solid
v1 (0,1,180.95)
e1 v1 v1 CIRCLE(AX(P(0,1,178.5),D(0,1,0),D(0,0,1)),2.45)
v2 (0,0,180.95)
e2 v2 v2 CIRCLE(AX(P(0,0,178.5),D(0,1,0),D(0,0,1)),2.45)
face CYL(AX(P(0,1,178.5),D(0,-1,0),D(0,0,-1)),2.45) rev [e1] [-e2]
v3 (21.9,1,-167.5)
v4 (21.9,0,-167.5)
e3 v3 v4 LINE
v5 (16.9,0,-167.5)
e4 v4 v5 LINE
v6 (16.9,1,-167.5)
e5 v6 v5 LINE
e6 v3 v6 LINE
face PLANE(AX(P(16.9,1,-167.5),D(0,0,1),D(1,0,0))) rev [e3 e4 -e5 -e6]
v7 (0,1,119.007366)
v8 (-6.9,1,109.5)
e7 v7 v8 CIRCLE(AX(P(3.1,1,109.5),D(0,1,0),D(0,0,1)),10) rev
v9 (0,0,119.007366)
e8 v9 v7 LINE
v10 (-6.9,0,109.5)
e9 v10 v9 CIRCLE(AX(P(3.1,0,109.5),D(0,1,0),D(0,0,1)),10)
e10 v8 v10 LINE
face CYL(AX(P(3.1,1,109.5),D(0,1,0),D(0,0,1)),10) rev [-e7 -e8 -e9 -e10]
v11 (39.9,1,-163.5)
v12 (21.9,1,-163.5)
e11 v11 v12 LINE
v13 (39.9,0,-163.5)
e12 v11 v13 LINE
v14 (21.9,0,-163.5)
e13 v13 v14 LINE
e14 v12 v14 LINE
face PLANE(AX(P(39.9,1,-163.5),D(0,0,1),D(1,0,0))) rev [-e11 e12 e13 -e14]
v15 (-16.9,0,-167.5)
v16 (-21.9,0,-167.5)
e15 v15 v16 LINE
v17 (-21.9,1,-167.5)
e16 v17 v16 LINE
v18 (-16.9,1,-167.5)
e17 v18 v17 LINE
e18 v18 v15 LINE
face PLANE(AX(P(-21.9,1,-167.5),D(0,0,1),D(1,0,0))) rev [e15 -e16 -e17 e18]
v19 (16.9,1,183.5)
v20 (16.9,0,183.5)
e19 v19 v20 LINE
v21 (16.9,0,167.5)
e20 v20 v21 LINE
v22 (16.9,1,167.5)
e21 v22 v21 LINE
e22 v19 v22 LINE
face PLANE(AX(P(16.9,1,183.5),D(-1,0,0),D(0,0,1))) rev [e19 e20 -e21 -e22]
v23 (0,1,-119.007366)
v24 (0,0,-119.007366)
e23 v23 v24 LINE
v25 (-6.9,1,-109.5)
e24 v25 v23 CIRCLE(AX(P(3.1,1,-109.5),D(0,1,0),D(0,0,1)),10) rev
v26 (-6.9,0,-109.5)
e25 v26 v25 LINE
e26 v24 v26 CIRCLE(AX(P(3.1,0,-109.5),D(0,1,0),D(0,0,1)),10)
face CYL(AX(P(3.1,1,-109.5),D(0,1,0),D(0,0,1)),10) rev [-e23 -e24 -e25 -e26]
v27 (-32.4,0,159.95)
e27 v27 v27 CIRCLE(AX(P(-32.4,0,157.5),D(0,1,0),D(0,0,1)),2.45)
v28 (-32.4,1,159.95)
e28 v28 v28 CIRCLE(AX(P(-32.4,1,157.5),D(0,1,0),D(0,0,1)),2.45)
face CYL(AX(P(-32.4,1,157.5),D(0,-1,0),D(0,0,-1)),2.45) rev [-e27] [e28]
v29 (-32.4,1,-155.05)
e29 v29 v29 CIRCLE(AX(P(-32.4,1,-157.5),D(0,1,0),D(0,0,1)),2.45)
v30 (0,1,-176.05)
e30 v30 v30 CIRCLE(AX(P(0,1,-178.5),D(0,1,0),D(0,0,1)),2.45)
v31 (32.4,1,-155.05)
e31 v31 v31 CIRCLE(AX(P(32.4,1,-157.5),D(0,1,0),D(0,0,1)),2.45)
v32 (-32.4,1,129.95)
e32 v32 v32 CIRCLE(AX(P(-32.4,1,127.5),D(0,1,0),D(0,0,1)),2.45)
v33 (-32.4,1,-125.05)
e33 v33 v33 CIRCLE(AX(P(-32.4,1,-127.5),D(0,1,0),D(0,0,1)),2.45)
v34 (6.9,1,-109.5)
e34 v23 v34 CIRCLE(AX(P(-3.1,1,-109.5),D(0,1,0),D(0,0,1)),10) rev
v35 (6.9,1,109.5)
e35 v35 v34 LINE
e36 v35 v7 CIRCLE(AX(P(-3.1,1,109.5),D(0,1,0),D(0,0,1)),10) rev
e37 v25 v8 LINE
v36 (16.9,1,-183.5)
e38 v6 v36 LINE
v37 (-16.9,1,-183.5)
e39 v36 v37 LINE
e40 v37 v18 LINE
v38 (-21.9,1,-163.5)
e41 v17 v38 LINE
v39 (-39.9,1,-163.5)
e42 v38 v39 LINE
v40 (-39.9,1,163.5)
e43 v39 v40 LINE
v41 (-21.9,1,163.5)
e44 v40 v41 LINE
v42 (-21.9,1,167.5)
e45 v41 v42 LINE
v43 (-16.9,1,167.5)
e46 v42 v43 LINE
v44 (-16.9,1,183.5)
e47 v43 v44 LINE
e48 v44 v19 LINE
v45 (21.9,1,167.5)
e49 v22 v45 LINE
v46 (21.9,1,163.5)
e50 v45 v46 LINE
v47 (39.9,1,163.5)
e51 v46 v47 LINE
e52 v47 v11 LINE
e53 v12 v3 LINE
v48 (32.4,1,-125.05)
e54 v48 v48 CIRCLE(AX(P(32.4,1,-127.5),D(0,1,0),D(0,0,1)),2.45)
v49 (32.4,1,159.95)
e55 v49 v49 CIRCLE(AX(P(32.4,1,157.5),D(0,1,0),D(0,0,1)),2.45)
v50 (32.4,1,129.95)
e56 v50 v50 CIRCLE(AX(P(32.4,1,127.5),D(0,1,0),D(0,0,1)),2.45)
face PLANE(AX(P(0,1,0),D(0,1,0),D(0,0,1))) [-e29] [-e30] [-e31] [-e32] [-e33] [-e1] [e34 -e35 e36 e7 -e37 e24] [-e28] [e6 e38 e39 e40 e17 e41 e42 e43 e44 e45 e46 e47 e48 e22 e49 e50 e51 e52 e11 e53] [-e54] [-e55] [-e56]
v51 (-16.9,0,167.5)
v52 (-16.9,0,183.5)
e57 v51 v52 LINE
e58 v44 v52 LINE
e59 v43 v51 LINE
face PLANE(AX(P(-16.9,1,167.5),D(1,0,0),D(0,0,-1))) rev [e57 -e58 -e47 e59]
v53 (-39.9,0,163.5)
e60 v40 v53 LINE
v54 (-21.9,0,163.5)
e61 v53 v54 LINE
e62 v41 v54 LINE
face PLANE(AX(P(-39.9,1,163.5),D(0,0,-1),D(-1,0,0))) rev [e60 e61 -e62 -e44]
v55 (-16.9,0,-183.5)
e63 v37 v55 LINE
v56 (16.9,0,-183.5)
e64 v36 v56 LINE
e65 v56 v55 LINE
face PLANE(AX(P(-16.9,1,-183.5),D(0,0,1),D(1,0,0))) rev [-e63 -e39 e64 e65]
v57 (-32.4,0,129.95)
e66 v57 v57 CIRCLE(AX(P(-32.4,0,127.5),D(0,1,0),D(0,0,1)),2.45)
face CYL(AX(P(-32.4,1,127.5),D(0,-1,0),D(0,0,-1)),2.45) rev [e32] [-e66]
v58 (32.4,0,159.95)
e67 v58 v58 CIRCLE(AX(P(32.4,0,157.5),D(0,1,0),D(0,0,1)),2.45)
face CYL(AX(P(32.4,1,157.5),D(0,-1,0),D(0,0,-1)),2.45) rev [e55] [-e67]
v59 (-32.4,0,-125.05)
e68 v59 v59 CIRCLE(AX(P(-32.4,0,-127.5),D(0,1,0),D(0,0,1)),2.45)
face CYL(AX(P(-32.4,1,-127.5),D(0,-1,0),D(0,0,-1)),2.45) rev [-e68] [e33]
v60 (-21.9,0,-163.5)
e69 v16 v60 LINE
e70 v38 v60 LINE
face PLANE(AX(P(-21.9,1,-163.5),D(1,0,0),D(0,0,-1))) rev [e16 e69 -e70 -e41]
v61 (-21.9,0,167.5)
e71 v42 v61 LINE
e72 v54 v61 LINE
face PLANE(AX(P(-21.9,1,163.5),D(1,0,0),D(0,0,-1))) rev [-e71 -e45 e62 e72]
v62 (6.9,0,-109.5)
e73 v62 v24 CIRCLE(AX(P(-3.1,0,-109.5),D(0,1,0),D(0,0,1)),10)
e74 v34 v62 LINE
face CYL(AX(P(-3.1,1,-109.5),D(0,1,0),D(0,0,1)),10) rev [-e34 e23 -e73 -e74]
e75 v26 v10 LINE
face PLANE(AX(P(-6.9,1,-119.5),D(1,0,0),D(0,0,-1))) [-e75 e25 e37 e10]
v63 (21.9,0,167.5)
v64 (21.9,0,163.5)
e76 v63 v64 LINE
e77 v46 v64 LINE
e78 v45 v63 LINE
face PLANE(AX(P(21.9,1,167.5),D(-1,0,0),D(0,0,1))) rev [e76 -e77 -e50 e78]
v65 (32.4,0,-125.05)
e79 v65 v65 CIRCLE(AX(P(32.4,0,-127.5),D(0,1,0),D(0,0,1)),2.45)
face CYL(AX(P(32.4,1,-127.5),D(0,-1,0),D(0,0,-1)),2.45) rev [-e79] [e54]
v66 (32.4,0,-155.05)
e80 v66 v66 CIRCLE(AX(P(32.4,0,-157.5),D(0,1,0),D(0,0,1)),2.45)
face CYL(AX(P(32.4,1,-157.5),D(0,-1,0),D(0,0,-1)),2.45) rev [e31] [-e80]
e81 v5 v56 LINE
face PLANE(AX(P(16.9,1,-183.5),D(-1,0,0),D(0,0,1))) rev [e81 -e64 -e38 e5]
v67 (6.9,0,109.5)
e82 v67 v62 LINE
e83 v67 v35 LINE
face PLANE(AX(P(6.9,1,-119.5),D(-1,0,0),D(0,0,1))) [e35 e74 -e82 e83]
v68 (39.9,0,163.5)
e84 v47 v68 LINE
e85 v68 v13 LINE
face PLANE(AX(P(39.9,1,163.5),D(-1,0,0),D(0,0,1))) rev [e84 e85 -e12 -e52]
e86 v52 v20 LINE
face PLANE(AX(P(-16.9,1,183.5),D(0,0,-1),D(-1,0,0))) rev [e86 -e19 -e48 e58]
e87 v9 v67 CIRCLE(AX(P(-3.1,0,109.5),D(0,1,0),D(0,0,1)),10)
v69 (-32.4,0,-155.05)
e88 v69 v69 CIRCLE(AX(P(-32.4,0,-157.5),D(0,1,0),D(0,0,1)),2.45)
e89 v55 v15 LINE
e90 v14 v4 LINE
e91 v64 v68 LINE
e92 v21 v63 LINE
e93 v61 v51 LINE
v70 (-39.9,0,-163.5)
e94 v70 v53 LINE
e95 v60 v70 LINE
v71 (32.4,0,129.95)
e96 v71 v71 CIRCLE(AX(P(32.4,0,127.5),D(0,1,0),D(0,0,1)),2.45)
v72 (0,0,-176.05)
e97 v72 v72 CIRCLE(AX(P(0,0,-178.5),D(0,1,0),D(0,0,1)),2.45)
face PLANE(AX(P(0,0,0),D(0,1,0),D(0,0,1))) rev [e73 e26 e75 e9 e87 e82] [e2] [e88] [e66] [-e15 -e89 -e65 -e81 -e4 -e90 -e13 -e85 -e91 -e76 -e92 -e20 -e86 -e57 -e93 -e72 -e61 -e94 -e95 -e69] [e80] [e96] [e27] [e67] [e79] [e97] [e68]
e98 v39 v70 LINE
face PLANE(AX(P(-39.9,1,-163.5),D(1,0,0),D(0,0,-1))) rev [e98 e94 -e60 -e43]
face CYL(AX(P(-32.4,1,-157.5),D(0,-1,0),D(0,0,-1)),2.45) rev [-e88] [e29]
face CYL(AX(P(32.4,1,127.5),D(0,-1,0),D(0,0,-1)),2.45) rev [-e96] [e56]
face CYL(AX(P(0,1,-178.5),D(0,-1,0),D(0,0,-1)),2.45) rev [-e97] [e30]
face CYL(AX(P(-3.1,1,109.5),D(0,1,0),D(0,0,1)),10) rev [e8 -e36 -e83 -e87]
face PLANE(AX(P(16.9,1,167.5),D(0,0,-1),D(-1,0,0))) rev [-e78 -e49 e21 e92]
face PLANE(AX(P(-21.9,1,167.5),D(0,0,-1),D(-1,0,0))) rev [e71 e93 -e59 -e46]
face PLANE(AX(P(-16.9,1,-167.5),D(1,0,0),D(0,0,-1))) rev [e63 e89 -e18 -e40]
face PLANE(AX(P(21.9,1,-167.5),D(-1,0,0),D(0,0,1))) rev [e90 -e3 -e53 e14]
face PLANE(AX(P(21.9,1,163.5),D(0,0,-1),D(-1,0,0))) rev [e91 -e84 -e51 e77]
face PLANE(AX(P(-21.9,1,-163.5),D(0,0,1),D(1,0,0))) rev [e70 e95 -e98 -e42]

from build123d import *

# Parameters (mm, degrees)
SKETCH1_R           = 2.45
SKETCH1_W           = 13.8
SKETCH1_H           = 239
BOSS_EXTRUDE1_DEPTH = 1
FILLET2_R           = 10


with BuildPart() as part:
    # Sketch1 → Boss-Extrude1 (new body)
    with BuildSketch(Plane(origin=(0, 0, 0), x_dir=(1, 0, 0), z_dir=(0, 1, 0))):
        Polygon((-39.9, -163.5), (-21.9, -163.5), (-21.9, -167.5), (-16.9, -167.5), (-16.9, -183.5), (16.9, -183.5), (16.9, -167.5), (21.9, -167.5), (21.9, -163.5), (39.9, -163.5), (39.9, 163.5), (21.9, 163.5), (21.9, 167.5), (16.9, 167.5), (16.9, 183.5), (-16.9, 183.5), (-16.9, 167.5), (-21.9, 167.5), (-21.9, 163.5), (-39.9, 163.5), align=None)
        with Locations(Location((-32.4, 127.5, 0), (0, 0, 270))):
            Circle(SKETCH1_R, mode=Mode.SUBTRACT)
        with Locations(Location((32.4, 127.5, 0), (0, 0, 270))):
            Circle(SKETCH1_R, mode=Mode.SUBTRACT)
        with Locations(Location((-32.4, -127.5, 0), (0, 0, 270))):
            Circle(SKETCH1_R, mode=Mode.SUBTRACT)
        with Locations(Location((32.4, -127.5, 0), (0, 0, 270))):
            Circle(SKETCH1_R, mode=Mode.SUBTRACT)
        with Locations(Location((-32.4, -157.5, 0), (0, 0, 270))):
            Circle(SKETCH1_R, mode=Mode.SUBTRACT)
        with Locations(Location((32.4, -157.5, 0), (0, 0, 270))):
            Circle(SKETCH1_R, mode=Mode.SUBTRACT)
        with Locations(Location((32.4, 157.5, 0), (0, 0, 270))):
            Circle(SKETCH1_R, mode=Mode.SUBTRACT)
        with Locations(Location((-32.4, 157.5, 0), (0, 0, 270))):
            Circle(SKETCH1_R, mode=Mode.SUBTRACT)
        with Locations(Location((0, 178.5, 0), (0, 0, 270))):
            Circle(SKETCH1_R, mode=Mode.SUBTRACT)
        with Locations(Location((0, -178.5, 0), (0, 0, 270))):
            Circle(SKETCH1_R, mode=Mode.SUBTRACT)
        Rectangle(SKETCH1_W, SKETCH1_H, mode=Mode.SUBTRACT)
    extrude(amount=BOSS_EXTRUDE1_DEPTH)

    # Fillet2
    # the kernel refuses this fillet: 10 mm, written as the material it adds along each edge
    with BuildSketch(Plane(origin=(6.9, 0, -119.5), x_dir=(-1, 0, 0), z_dir=(0, 1, 0)), Plane(origin=(6.9, 0, 119.5), x_dir=(0, 0, -1), z_dir=(0, 1, 0)), Plane(origin=(-6.9, 0, 119.5), x_dir=(1, 0, 0), z_dir=(0, 1, 0))) as fillet2_piece_1:
        with BuildLine():
            CenterArc((FILLET2_R, FILLET2_R), FILLET2_R, 180, 90)
            Line((0, FILLET2_R), (0, 0))
            Line((0, 0), (FILLET2_R, 0))
        make_face()
    extrude(amount=1)
    with BuildSketch(Plane(origin=(-6.9, 0, -119.5), x_dir=(1, 0, 0), z_dir=(0, 1, 0))) as fillet2_piece_2:
        with BuildLine():
            CenterArc((FILLET2_R, -FILLET2_R), FILLET2_R, 90, 90)
            Line((0, -FILLET2_R), (0, 0))
            Line((0, 0), (FILLET2_R, 0))
        make_face()
    extrude(amount=1)


solid = part.part
